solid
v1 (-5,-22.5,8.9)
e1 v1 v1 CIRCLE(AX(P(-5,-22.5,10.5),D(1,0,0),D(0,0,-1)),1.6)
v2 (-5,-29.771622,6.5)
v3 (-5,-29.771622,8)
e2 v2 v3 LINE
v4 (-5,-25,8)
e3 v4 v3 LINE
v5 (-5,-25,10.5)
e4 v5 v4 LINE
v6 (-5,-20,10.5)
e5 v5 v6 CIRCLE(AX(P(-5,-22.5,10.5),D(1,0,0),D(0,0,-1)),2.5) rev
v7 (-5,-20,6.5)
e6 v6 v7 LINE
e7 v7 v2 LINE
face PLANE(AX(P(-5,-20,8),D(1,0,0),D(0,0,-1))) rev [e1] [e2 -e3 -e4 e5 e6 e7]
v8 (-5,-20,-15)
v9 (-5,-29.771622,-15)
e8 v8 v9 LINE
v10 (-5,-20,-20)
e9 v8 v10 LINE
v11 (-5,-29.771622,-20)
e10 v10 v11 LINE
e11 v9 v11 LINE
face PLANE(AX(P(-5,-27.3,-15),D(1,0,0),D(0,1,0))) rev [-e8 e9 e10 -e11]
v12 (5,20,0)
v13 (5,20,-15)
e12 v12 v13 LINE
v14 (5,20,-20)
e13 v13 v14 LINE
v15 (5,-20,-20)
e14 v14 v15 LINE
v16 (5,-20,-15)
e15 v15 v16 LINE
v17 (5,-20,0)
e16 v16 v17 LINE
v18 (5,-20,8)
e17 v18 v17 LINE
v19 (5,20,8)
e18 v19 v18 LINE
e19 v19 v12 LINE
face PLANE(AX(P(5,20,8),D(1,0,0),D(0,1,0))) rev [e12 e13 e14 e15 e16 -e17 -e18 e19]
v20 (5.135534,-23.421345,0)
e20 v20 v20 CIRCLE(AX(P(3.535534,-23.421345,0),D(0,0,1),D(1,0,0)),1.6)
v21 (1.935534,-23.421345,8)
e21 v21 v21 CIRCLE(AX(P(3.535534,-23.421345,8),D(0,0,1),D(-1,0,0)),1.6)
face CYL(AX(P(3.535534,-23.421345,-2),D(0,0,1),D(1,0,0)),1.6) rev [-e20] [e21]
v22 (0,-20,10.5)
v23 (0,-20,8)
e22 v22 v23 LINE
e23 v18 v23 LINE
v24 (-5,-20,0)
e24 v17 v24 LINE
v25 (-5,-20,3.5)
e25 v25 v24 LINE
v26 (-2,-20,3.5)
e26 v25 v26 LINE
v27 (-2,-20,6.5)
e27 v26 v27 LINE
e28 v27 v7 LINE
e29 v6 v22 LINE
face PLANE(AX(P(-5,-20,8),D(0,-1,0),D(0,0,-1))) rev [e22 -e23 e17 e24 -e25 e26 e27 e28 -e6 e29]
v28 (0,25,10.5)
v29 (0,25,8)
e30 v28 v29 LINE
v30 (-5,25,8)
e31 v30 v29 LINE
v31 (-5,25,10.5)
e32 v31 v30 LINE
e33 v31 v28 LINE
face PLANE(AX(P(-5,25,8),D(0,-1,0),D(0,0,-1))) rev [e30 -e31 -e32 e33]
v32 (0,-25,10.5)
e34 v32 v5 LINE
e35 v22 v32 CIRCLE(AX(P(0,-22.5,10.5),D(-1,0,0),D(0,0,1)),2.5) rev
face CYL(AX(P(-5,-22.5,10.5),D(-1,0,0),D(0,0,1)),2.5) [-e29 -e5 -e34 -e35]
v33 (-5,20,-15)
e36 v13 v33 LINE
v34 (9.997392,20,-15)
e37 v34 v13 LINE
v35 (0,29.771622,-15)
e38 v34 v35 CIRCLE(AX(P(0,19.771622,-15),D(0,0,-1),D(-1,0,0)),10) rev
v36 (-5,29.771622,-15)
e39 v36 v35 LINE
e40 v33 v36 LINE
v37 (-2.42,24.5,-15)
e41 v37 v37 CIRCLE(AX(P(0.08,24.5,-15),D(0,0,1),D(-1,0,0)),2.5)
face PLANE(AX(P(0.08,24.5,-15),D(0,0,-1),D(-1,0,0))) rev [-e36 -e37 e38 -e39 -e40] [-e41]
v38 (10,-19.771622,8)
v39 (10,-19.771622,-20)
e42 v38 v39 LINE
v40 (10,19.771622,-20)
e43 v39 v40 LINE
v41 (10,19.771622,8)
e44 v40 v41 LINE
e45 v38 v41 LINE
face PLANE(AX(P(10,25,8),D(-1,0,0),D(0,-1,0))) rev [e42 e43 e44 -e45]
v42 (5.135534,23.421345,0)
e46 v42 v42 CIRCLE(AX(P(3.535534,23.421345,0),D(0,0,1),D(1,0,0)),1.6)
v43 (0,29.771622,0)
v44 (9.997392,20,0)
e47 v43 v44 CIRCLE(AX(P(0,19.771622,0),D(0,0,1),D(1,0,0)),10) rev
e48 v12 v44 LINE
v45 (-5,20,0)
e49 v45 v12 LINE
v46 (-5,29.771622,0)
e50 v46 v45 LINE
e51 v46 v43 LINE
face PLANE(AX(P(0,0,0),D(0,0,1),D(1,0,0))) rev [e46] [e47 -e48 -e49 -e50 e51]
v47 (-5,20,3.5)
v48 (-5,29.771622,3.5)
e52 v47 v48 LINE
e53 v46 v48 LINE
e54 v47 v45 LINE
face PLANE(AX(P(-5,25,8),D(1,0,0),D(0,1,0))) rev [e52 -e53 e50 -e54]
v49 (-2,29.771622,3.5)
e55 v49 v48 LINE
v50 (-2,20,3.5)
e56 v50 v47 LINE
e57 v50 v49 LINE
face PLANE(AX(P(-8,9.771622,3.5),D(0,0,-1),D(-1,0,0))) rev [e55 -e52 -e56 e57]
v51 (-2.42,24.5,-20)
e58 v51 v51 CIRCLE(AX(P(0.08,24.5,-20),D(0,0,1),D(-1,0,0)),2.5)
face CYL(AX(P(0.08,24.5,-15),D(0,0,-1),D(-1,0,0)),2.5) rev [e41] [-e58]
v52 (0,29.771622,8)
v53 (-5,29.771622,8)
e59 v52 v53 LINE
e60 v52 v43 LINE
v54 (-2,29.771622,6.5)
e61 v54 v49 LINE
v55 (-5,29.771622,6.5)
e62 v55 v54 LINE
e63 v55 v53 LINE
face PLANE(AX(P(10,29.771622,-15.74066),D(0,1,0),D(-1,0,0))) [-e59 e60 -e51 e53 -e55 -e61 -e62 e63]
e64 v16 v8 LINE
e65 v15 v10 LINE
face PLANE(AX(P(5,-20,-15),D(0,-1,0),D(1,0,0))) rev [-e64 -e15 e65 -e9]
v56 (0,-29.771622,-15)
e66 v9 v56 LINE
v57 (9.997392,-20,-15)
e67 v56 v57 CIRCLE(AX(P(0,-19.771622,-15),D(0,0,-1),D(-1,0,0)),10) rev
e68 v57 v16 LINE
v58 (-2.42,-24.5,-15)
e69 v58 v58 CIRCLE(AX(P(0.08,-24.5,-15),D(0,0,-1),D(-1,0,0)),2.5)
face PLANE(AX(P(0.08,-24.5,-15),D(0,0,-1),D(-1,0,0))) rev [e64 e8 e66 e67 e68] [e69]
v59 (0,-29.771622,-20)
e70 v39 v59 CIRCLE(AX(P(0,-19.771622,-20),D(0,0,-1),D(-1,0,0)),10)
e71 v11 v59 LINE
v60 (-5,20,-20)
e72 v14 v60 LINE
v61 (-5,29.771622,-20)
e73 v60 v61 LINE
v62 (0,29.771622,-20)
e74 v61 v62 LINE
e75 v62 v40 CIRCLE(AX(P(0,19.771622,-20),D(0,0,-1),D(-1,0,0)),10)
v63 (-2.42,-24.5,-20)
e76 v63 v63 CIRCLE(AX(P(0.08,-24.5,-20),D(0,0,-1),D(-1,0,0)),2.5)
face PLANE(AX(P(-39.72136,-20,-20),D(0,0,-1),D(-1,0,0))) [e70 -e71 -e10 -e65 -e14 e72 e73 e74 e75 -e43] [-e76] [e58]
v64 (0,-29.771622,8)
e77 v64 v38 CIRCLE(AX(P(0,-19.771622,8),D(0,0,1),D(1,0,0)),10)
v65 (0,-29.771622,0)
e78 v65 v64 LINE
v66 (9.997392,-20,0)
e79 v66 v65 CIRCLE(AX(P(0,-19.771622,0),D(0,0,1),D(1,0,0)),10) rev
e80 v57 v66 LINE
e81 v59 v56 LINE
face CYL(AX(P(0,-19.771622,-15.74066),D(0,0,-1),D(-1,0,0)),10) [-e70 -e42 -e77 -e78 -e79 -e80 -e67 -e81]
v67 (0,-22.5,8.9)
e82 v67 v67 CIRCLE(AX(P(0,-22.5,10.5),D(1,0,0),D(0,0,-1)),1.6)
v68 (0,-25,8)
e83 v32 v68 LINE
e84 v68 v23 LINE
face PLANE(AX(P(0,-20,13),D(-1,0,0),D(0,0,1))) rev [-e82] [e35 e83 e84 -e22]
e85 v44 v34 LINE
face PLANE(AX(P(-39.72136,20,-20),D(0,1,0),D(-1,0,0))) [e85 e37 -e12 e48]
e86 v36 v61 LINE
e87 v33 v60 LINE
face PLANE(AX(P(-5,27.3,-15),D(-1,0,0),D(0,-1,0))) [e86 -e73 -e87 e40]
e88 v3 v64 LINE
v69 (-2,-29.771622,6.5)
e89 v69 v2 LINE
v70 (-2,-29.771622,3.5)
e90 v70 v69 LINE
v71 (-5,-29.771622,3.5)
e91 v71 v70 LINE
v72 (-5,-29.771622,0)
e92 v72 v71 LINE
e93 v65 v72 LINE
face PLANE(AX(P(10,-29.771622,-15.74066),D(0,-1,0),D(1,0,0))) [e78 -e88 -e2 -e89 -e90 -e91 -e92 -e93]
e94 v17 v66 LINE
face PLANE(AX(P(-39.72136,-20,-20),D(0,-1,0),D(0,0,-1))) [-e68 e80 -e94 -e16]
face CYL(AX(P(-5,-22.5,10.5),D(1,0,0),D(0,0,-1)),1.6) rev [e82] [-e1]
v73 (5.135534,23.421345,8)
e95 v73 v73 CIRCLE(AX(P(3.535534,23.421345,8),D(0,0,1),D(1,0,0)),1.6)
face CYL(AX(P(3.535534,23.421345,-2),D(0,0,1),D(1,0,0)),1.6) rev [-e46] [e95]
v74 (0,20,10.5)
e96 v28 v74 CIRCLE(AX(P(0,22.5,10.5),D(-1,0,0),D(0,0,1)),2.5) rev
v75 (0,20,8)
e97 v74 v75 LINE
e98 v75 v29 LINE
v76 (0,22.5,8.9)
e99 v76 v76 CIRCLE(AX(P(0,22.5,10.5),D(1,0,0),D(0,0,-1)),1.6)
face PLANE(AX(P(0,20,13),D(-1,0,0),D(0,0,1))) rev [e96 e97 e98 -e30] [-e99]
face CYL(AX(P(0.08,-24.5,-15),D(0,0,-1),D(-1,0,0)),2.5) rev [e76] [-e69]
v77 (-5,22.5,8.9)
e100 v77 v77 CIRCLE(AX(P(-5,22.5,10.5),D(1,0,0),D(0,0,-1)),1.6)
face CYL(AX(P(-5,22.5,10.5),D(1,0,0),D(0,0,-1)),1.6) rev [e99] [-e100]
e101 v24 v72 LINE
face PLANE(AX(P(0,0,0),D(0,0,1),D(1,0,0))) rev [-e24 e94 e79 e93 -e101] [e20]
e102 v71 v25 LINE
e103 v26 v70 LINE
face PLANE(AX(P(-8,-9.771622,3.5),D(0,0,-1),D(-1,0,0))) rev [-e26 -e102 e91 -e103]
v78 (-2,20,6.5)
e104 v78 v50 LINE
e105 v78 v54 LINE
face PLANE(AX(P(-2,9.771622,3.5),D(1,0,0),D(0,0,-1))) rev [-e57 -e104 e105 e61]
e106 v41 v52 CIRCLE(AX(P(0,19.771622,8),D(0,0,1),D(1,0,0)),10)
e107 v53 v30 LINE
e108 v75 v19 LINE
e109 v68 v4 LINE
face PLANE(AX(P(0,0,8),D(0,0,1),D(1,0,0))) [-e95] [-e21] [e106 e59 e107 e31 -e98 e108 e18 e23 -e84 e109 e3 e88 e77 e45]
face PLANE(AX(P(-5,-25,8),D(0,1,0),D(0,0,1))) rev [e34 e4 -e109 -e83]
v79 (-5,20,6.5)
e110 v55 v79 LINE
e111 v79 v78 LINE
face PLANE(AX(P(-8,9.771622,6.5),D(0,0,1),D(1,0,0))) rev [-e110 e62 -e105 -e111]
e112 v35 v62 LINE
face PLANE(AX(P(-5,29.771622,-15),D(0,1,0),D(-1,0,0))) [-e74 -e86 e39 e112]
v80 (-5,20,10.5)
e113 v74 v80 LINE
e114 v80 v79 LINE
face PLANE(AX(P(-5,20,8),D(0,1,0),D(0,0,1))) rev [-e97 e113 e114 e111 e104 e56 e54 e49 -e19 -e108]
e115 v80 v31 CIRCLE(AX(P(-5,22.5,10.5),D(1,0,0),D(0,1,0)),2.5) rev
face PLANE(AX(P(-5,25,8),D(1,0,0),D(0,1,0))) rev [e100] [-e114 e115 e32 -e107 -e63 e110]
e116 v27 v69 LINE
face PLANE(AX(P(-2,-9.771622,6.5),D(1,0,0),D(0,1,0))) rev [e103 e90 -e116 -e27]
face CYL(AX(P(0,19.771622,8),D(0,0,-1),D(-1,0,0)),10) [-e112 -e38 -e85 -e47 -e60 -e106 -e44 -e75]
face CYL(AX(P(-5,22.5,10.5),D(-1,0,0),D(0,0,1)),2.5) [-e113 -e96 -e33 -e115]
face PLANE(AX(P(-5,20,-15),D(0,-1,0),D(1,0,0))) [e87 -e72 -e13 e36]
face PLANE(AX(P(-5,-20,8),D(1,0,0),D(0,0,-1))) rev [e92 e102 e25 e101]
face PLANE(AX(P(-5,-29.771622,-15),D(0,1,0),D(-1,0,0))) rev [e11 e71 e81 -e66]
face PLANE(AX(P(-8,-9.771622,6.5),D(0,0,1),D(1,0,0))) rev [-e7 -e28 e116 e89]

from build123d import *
from build123d.topology import SkipClean

# Parameters (mm, degrees)
BOSS_EXTRUDE1_DEPTH = 8
SKETCH2_W           = 20
SKETCH2_H           = 40
BOSS_EXTRUDE2_DEPTH = 5
SKETCH3_W           = 5
SKETCH3_H           = 5
BOSS_EXTRUDE3_DEPTH = 5
FILLET2_RADIUS      = 2.5
FILLET2_LENGTH      = 5
FILLET3_RADIUS      = 2.5
FILLET3_LENGTH      = 5
SKETCH6_R           = 1.6
CUT_EXTRUDE3_DEPTH  = 34.541019662
BOSS_EXTRUDE4_DEPTH = 5
BOSS_EXTRUDE5_DEPTH = 5
SKETCH11_W          = 15
SKETCH11_H          = 4.771622141
BOSS_EXTRUDE6_DEPTH = 8
FILLET4_R           = 10
FILLET5_START       = -21
FILLET5_DEPTH       = 30
SKETCH12_R          = 1.6
CUT_EXTRUDE4_DEPTH  = 10
SKETCH15_W          = 6
SKETCH15_H          = 3
CUT_EXTRUDE7_DEPTH  = 20
SKETCH17_W          = 6
SKETCH17_H          = 3
CUT_EXTRUDE8_DEPTH  = 20


with BuildPart() as part:
    # Sketch1 → Boss-Extrude1 (new body)
    with BuildSketch(Plane.XY):
        Polygon((-5, 25), (10, 25), (10, -25), (-5, -25), (-5, -20), (5, -20), (5, 20), (-5, 20), align=None)
    extrude(amount=BOSS_EXTRUDE1_DEPTH)

    # Sketch2 → Boss-Extrude2 (add)
    with BuildSketch(Plane(origin=(10, 0, 0), x_dir=(0, 0, -1), z_dir=(1, 0, 0))):
        with Locations((10, 0)):
            Rectangle(SKETCH2_W, SKETCH2_H)
    extrude(amount=-BOSS_EXTRUDE2_DEPTH)

    # Sketch3 → Boss-Extrude3 (add)
    with BuildSketch(Plane.XY.offset(8)):
        with Locations((-2.5, 22.5)):
            Rectangle(SKETCH3_W, SKETCH3_H)
        with Locations((-2.5, -22.5)):
            Rectangle(SKETCH3_W, SKETCH3_H)
    extrude(amount=BOSS_EXTRUDE3_DEPTH)

    # Fillet2: full round fillet: the end face becomes a half cylinder, R = half its width
    fillet2_face = Plane((-2.5, 22.5, 13), x_dir=(1, 0, 0), z_dir=(0, 0, 1))  # on the end face: x along it, z out of the body
    fillet2_slab = fillet2_face.offset(-FILLET2_RADIUS / 2) * Box(FILLET2_LENGTH, 2 * FILLET2_RADIUS, FILLET2_RADIUS, mode=Mode.PRIVATE)  # the body's end, R deep
    fillet2_round = Plane((-2.5, 22.5, 10.5), x_dir=(0, 0, 1), z_dir=(1, 0, 0)) * Cylinder(FILLET2_RADIUS, FILLET2_LENGTH, mode=Mode.PRIVATE)  # its axis R under the face
    add(fillet2_slab - fillet2_round, mode=Mode.SUBTRACT)

    # Fillet3: full round fillet: the end face becomes a half cylinder, R = half its width
    fillet3_face = Plane((-2.5, -22.5, 13), x_dir=(1, 0, 0), z_dir=(0, 0, 1))  # on the end face: x along it, z out of the body
    fillet3_slab = fillet3_face.offset(-FILLET3_RADIUS / 2) * Box(FILLET3_LENGTH, 2 * FILLET3_RADIUS, FILLET3_RADIUS, mode=Mode.PRIVATE)  # the body's end, R deep
    fillet3_round = Plane((-2.5, -22.5, 10.5), x_dir=(0, 0, 1), z_dir=(1, 0, 0)) * Cylinder(FILLET3_RADIUS, FILLET3_LENGTH, mode=Mode.PRIVATE)  # its axis R under the face
    add(fillet3_slab - fillet3_round, mode=Mode.SUBTRACT)

    # Sketch6 → Cut-Extrude3 (cut, through all)
    with BuildSketch(Plane(origin=(0, 0, 0), x_dir=(0, 0, -1), z_dir=(1, 0, 0))):
        with Locations((-10.5, 22.5)):
            Circle(SKETCH6_R)
        with Locations((-10.5, -22.5)):
            Circle(SKETCH6_R)
    extrude(amount=-CUT_EXTRUDE3_DEPTH, mode=Mode.SUBTRACT)

    # Sketch7 → Boss-Extrude4 (add)
    with BuildSketch(Plane(origin=(0, 0, -20), x_dir=(-1, 0, 0), z_dir=(0, 0, -1))):
        with BuildLine():
            Line((5, 27.3), (5, 20))
            Line((5, 20), (-5, 20))
            Line((-5, 20), (-10, 20))
            Line((-10, 20), (-10, 27.3))
            Line((-10, 27.3), (-1.58, 27.3))
            Line((-1.58, 27.3), (-1.58, 26.5))
            ThreePointArc((-1.58, 26.5), (-0.08, 22), (1.42, 26.5))
            Line((1.42, 26.5), (1.42, 27.3))
            Line((1.42, 27.3), (5, 27.3))
        make_face()
    boss_extrude4 = extrude(amount=-BOSS_EXTRUDE4_DEPTH)

    # Mirror3: Boss-Extrude4 across plane
    add(boss_extrude4.mirror(Plane.ZX))

    # Sketch10 → Boss-Extrude5 (add)
    with SkipClean():  # the faces are left unmerged after this step: merging them gives an invalid solid
        with BuildSketch(Plane(origin=(0, 0, -20), x_dir=(-1, 0, 0), z_dir=(0, 0, -1))):
            with BuildLine():
                Line((5, 29.771622141), (-10, 29.771622141))
                Line((-10, 29.771622141), (-10, 27.3))
                Line((-10, 27.3), (-1.58, 27.3))
                Line((-1.58, 27.3), (-1.58, 26.5))
                ThreePointArc((-1.58, 26.5), (-0.08, 27), (1.42, 26.5))
                Line((1.42, 26.5), (1.42, 27.3))
                Line((1.42, 27.3), (5, 27.3))
                Line((5, 27.3), (5, 29.771622141))
            make_face()
        boss_extrude5 = extrude(amount=-BOSS_EXTRUDE5_DEPTH)

    # Mirror4: Boss-Extrude5 across plane
    with SkipClean():  # the faces are left unmerged after this step: merging them gives an invalid solid
        add(boss_extrude5.mirror(Plane.ZX))

    # Sketch11 → Boss-Extrude6 (add)
    with SkipClean():  # the faces are left unmerged after this step: merging them gives an invalid solid
        with BuildSketch(Plane.XY.offset(8)):
            with Locations((2.5, 27.385811071)):
                Rectangle(SKETCH11_W, SKETCH11_H)
            with Locations((2.5, -27.385811071)):
                Rectangle(SKETCH11_W, SKETCH11_H)
        extrude(amount=-BOSS_EXTRUDE6_DEPTH)

    # Fillet4
    # the kernel refuses this fillet: 10 mm, written as the material it takes off along each edge
    with BuildSketch(Plane(origin=(10, 29.771622141, 33), x_dir=(0, -1, 0), z_dir=(0, 0, -1))) as fillet4_piece_1:
        with BuildLine():
            CenterArc((FILLET4_R, FILLET4_R), FILLET4_R, 180, 90)
            Line((0, FILLET4_R), (0, 0))
            Line((0, 0), (FILLET4_R, 0))
        make_face()
    extrude(amount=58, mode=Mode.SUBTRACT)

    # Fillet5: read off the stored shape, not the designer's step
    # Fillet5 outline → Fillet5 (cut)
    with BuildSketch(Plane.XY.offset(FILLET5_START)):
        with BuildLine():
            Line((10, -29.771622141), (10, -19.771622141))
            ThreePointArc((10, -19.771622141), (7.071067812, -26.842689953), (0, -29.771622141))
            Line((0, -29.771622141), (10, -29.771622141))
        make_face()
    extrude(amount=FILLET5_DEPTH, mode=Mode.SUBTRACT)

    # Sketch12 → Cut-Extrude4 (cut)
    with BuildSketch(Plane.XY.offset(8)):
        with Locations((3.535533906, 23.421344977)):
            Circle(SKETCH12_R)
        with Locations((3.535533906, -23.421344977)):
            Circle(SKETCH12_R)
    extrude(amount=-CUT_EXTRUDE4_DEPTH, mode=Mode.SUBTRACT)

    # Sketch15 → Cut-Extrude7 (cut)
    with BuildSketch(Plane.XZ.offset(29.771622141)):
        with Locations((-5, 5)):
            Rectangle(SKETCH15_W, SKETCH15_H)
    extrude(amount=-CUT_EXTRUDE7_DEPTH, mode=Mode.SUBTRACT)

    # Sketch17 → Cut-Extrude8 (cut)
    with BuildSketch(Plane(origin=(0, 29.771622141, 0), x_dir=(1, 0, 0), z_dir=(0, 1, 0))):
        with Locations((-5, -5)):
            Rectangle(SKETCH17_W, SKETCH17_H)
    extrude(amount=-CUT_EXTRUDE8_DEPTH, mode=Mode.SUBTRACT)


solid = part.part
